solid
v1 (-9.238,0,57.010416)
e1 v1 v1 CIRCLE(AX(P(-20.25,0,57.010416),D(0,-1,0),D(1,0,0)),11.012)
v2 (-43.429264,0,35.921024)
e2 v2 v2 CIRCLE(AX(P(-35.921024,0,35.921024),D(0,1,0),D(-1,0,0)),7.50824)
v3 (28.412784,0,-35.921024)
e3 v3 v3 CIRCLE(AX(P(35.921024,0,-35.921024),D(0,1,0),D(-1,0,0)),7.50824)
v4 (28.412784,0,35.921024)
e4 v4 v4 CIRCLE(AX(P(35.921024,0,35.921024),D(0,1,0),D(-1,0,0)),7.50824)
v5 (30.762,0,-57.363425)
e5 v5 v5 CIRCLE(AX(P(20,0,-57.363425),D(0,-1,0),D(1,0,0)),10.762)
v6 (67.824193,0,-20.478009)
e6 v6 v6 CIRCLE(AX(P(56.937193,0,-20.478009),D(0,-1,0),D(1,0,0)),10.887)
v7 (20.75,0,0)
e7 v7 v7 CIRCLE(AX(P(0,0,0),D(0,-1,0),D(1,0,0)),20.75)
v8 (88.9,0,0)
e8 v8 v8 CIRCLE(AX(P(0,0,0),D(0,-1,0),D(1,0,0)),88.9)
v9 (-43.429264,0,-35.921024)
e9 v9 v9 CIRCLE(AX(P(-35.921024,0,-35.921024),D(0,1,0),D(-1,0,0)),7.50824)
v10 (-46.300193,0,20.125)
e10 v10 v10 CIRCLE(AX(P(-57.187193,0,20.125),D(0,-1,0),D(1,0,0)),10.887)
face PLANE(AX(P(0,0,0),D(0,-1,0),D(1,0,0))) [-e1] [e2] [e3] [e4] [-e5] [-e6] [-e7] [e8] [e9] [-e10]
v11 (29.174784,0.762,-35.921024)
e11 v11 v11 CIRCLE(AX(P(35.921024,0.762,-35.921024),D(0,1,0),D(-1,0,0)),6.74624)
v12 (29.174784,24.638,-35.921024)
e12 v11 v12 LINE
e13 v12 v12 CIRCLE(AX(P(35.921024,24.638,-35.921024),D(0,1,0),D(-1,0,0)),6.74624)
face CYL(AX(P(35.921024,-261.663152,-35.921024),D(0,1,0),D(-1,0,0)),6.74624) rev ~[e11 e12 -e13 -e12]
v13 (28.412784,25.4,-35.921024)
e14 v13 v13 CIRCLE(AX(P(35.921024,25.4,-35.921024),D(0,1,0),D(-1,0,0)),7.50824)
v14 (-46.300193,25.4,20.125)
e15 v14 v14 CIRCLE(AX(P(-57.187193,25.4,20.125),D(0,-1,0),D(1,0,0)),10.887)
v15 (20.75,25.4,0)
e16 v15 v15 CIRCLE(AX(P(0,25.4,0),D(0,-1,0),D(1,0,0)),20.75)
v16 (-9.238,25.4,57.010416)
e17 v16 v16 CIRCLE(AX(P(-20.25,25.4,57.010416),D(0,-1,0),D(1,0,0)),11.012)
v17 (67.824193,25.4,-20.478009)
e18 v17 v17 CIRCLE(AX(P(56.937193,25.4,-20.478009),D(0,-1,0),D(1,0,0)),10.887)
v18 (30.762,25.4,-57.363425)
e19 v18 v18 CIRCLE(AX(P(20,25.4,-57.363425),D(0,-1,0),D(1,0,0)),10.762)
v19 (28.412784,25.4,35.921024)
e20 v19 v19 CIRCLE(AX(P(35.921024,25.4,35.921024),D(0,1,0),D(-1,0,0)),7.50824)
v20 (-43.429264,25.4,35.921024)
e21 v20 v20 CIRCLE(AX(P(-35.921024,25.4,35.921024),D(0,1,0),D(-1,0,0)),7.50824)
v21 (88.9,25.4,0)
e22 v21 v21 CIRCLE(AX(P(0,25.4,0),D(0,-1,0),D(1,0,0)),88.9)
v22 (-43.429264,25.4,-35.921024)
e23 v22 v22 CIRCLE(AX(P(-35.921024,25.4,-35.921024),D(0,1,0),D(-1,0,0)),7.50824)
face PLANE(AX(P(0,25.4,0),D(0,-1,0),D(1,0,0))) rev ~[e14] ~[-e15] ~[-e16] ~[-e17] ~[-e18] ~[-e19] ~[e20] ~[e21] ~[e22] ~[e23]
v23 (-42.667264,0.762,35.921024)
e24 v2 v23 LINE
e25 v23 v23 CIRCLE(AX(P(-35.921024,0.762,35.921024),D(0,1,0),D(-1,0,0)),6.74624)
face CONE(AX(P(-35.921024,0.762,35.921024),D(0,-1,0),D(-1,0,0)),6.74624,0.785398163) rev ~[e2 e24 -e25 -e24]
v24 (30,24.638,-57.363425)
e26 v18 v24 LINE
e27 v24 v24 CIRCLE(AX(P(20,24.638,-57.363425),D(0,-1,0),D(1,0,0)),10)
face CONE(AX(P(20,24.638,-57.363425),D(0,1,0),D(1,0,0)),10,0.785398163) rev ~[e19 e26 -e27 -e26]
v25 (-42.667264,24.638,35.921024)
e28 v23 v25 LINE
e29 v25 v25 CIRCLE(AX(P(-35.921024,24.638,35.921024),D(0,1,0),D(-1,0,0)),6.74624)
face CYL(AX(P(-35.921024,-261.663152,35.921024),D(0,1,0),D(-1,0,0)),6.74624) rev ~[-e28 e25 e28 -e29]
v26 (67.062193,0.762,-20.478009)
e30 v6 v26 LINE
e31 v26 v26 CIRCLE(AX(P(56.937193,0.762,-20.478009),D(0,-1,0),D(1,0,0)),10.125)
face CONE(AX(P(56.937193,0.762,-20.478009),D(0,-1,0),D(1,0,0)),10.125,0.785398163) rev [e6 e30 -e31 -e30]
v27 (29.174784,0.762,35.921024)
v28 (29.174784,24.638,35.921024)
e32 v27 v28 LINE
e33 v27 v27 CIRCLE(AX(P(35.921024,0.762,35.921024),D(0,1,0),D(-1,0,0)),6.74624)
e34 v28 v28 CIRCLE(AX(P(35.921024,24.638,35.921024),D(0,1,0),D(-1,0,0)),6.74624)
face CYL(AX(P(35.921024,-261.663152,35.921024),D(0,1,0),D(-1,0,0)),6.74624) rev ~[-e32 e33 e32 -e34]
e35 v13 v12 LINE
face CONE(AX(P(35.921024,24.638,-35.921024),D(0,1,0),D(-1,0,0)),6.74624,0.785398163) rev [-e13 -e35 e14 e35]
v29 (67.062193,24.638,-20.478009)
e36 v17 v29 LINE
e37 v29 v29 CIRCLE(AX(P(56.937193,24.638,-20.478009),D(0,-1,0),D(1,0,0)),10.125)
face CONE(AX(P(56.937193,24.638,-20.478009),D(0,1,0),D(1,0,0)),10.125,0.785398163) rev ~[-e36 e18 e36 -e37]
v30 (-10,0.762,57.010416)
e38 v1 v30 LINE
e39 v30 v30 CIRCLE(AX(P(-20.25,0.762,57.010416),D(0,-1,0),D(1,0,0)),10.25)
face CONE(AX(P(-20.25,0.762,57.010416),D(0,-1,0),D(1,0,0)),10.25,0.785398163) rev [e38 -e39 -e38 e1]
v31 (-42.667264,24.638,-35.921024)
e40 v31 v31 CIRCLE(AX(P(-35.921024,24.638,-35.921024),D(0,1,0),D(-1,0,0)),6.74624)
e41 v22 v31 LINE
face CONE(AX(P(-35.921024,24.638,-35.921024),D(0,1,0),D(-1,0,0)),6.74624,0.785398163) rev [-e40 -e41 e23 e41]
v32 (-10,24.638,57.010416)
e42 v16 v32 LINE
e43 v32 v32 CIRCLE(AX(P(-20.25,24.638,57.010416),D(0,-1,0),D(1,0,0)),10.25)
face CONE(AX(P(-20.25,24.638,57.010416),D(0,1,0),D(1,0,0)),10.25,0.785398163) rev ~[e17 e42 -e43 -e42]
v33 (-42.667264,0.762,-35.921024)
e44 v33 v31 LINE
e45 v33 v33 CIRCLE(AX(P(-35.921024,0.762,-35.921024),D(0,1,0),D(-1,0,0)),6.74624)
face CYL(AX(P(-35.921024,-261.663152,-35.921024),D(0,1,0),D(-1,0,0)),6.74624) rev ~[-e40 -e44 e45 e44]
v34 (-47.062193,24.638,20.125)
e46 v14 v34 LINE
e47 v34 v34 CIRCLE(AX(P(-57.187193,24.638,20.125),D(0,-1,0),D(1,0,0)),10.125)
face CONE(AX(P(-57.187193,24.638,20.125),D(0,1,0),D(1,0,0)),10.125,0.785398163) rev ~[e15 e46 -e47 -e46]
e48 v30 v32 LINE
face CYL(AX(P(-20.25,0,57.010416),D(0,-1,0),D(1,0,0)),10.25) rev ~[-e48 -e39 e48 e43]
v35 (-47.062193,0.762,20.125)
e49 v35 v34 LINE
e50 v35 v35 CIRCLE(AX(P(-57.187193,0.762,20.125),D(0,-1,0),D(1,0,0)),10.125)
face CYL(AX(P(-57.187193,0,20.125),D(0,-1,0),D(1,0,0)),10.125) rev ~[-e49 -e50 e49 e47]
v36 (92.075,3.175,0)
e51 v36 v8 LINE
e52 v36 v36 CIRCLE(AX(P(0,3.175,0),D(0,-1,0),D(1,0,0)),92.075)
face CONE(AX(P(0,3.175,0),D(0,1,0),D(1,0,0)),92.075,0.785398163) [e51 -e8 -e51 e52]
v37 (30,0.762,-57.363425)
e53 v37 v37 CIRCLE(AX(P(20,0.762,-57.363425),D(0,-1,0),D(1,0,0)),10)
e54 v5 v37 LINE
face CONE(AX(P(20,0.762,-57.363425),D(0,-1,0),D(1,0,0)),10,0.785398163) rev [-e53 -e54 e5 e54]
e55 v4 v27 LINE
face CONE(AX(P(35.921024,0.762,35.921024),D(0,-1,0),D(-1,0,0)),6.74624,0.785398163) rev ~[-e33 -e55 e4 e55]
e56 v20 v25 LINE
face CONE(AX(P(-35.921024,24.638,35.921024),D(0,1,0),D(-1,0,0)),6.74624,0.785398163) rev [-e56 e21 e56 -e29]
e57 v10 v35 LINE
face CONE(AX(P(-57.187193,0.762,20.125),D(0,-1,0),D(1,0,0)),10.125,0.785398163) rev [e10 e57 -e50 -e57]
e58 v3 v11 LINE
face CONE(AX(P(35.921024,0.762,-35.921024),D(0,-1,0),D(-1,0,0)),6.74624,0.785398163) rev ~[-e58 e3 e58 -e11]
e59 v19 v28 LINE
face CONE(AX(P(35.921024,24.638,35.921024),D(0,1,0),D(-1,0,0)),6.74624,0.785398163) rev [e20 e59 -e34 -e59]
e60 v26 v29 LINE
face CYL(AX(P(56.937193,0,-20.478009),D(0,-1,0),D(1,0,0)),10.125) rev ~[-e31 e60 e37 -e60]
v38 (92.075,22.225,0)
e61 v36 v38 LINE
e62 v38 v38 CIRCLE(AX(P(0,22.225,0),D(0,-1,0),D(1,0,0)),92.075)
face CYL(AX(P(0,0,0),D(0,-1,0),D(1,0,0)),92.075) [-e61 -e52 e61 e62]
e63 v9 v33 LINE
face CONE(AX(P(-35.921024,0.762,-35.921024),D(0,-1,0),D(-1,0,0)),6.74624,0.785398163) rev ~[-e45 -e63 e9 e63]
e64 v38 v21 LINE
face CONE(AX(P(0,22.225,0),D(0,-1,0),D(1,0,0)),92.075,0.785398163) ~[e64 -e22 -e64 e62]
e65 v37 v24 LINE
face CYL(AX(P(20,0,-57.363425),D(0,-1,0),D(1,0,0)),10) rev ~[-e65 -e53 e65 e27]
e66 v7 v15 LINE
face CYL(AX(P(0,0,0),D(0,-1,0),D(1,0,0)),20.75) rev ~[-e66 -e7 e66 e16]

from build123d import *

# Parameters (mm, degrees)
F0_R     = 92.075
F0_R_2   = 20.75
F1_DEPTH = 25.4
F2_R     = 10.125
F2_R_2   = 10.25
F2_R_3   = 10
F3_DEPTH = 25.4
F5_D     = 13.49248
F6_SIZE  = 3.175
F7_SIZE  = 0.762


with BuildPart() as f1:
    # F0 (on Front) → F1 (new body)
    with BuildSketch(Plane.XZ):
        Circle(F0_R)
        Circle(F0_R_2, mode=Mode.SUBTRACT)
    extrude(amount=-F1_DEPTH)

    # F2 (on face) → F3 (cut)
    with BuildSketch(Plane.XZ):
        with Locations((-57.1871926221, 20.125)):
            Circle(F2_R)
        with Locations((-20.25, 57.010415715)):
            Circle(F2_R_2)
        with Locations((56.9371926221, -20.4780090433)):
            Circle(F2_R)
        with Locations((20, -57.3634247583)):
            Circle(F2_R_3)
    extrude(amount=-F3_DEPTH, mode=Mode.SUBTRACT)

    # F5 (through all)
    with Locations(Plane.XZ):
        with Locations((-35.9210244843, 35.9210244843), (35.9210244843, 35.9210244843), (35.9210244843, -35.9210244843), (-35.9210244843, -35.9210244843)):
            Hole(F5_D / 2)

    # F6
    f6_edges = [f1.edges().sort_by_distance(p)[0] for p in [
        (92.075, 12.7, 0),
        (-92.075, 0, 0),
        (-92.075, 25.4, 0),
    ]]
    chamfer(f6_edges, length=F6_SIZE)

    # F7
    f7_edges = [f1.edges().sort_by_distance(p)[0] for p in [
        (-47.062193, 12.7, 20.125),
        (-67.312193, 0, 20.125),
        (-67.312193, 25.4, 20.125),
        (-10, 12.7, 57.010416),
        (-30.5, 0, 57.010416),
        (-30.5, 25.4, 57.010416),
        (67.062193, 12.7, -20.478009),
        (46.812193, 0, -20.478009),
        (46.812193, 25.4, -20.478009),
        (30, 12.7, -57.363425),
        (10, 0, -57.363425),
        (10, 25.4, -57.363425),
        (-42.667264, 0, -35.921024),
        (29.174784, 0, -35.921024),
        (-42.667264, 0, 35.921024),
        (29.174784, 0, 35.921024),
        (-42.667264, 25.4, -35.921024),
        (29.174784, 25.4, -35.921024),
        (-42.667264, 25.4, 35.921024),
        (29.174784, 25.4, 35.921024),
    ]]
    chamfer(f7_edges, length=F7_SIZE)


solid = f1.part
